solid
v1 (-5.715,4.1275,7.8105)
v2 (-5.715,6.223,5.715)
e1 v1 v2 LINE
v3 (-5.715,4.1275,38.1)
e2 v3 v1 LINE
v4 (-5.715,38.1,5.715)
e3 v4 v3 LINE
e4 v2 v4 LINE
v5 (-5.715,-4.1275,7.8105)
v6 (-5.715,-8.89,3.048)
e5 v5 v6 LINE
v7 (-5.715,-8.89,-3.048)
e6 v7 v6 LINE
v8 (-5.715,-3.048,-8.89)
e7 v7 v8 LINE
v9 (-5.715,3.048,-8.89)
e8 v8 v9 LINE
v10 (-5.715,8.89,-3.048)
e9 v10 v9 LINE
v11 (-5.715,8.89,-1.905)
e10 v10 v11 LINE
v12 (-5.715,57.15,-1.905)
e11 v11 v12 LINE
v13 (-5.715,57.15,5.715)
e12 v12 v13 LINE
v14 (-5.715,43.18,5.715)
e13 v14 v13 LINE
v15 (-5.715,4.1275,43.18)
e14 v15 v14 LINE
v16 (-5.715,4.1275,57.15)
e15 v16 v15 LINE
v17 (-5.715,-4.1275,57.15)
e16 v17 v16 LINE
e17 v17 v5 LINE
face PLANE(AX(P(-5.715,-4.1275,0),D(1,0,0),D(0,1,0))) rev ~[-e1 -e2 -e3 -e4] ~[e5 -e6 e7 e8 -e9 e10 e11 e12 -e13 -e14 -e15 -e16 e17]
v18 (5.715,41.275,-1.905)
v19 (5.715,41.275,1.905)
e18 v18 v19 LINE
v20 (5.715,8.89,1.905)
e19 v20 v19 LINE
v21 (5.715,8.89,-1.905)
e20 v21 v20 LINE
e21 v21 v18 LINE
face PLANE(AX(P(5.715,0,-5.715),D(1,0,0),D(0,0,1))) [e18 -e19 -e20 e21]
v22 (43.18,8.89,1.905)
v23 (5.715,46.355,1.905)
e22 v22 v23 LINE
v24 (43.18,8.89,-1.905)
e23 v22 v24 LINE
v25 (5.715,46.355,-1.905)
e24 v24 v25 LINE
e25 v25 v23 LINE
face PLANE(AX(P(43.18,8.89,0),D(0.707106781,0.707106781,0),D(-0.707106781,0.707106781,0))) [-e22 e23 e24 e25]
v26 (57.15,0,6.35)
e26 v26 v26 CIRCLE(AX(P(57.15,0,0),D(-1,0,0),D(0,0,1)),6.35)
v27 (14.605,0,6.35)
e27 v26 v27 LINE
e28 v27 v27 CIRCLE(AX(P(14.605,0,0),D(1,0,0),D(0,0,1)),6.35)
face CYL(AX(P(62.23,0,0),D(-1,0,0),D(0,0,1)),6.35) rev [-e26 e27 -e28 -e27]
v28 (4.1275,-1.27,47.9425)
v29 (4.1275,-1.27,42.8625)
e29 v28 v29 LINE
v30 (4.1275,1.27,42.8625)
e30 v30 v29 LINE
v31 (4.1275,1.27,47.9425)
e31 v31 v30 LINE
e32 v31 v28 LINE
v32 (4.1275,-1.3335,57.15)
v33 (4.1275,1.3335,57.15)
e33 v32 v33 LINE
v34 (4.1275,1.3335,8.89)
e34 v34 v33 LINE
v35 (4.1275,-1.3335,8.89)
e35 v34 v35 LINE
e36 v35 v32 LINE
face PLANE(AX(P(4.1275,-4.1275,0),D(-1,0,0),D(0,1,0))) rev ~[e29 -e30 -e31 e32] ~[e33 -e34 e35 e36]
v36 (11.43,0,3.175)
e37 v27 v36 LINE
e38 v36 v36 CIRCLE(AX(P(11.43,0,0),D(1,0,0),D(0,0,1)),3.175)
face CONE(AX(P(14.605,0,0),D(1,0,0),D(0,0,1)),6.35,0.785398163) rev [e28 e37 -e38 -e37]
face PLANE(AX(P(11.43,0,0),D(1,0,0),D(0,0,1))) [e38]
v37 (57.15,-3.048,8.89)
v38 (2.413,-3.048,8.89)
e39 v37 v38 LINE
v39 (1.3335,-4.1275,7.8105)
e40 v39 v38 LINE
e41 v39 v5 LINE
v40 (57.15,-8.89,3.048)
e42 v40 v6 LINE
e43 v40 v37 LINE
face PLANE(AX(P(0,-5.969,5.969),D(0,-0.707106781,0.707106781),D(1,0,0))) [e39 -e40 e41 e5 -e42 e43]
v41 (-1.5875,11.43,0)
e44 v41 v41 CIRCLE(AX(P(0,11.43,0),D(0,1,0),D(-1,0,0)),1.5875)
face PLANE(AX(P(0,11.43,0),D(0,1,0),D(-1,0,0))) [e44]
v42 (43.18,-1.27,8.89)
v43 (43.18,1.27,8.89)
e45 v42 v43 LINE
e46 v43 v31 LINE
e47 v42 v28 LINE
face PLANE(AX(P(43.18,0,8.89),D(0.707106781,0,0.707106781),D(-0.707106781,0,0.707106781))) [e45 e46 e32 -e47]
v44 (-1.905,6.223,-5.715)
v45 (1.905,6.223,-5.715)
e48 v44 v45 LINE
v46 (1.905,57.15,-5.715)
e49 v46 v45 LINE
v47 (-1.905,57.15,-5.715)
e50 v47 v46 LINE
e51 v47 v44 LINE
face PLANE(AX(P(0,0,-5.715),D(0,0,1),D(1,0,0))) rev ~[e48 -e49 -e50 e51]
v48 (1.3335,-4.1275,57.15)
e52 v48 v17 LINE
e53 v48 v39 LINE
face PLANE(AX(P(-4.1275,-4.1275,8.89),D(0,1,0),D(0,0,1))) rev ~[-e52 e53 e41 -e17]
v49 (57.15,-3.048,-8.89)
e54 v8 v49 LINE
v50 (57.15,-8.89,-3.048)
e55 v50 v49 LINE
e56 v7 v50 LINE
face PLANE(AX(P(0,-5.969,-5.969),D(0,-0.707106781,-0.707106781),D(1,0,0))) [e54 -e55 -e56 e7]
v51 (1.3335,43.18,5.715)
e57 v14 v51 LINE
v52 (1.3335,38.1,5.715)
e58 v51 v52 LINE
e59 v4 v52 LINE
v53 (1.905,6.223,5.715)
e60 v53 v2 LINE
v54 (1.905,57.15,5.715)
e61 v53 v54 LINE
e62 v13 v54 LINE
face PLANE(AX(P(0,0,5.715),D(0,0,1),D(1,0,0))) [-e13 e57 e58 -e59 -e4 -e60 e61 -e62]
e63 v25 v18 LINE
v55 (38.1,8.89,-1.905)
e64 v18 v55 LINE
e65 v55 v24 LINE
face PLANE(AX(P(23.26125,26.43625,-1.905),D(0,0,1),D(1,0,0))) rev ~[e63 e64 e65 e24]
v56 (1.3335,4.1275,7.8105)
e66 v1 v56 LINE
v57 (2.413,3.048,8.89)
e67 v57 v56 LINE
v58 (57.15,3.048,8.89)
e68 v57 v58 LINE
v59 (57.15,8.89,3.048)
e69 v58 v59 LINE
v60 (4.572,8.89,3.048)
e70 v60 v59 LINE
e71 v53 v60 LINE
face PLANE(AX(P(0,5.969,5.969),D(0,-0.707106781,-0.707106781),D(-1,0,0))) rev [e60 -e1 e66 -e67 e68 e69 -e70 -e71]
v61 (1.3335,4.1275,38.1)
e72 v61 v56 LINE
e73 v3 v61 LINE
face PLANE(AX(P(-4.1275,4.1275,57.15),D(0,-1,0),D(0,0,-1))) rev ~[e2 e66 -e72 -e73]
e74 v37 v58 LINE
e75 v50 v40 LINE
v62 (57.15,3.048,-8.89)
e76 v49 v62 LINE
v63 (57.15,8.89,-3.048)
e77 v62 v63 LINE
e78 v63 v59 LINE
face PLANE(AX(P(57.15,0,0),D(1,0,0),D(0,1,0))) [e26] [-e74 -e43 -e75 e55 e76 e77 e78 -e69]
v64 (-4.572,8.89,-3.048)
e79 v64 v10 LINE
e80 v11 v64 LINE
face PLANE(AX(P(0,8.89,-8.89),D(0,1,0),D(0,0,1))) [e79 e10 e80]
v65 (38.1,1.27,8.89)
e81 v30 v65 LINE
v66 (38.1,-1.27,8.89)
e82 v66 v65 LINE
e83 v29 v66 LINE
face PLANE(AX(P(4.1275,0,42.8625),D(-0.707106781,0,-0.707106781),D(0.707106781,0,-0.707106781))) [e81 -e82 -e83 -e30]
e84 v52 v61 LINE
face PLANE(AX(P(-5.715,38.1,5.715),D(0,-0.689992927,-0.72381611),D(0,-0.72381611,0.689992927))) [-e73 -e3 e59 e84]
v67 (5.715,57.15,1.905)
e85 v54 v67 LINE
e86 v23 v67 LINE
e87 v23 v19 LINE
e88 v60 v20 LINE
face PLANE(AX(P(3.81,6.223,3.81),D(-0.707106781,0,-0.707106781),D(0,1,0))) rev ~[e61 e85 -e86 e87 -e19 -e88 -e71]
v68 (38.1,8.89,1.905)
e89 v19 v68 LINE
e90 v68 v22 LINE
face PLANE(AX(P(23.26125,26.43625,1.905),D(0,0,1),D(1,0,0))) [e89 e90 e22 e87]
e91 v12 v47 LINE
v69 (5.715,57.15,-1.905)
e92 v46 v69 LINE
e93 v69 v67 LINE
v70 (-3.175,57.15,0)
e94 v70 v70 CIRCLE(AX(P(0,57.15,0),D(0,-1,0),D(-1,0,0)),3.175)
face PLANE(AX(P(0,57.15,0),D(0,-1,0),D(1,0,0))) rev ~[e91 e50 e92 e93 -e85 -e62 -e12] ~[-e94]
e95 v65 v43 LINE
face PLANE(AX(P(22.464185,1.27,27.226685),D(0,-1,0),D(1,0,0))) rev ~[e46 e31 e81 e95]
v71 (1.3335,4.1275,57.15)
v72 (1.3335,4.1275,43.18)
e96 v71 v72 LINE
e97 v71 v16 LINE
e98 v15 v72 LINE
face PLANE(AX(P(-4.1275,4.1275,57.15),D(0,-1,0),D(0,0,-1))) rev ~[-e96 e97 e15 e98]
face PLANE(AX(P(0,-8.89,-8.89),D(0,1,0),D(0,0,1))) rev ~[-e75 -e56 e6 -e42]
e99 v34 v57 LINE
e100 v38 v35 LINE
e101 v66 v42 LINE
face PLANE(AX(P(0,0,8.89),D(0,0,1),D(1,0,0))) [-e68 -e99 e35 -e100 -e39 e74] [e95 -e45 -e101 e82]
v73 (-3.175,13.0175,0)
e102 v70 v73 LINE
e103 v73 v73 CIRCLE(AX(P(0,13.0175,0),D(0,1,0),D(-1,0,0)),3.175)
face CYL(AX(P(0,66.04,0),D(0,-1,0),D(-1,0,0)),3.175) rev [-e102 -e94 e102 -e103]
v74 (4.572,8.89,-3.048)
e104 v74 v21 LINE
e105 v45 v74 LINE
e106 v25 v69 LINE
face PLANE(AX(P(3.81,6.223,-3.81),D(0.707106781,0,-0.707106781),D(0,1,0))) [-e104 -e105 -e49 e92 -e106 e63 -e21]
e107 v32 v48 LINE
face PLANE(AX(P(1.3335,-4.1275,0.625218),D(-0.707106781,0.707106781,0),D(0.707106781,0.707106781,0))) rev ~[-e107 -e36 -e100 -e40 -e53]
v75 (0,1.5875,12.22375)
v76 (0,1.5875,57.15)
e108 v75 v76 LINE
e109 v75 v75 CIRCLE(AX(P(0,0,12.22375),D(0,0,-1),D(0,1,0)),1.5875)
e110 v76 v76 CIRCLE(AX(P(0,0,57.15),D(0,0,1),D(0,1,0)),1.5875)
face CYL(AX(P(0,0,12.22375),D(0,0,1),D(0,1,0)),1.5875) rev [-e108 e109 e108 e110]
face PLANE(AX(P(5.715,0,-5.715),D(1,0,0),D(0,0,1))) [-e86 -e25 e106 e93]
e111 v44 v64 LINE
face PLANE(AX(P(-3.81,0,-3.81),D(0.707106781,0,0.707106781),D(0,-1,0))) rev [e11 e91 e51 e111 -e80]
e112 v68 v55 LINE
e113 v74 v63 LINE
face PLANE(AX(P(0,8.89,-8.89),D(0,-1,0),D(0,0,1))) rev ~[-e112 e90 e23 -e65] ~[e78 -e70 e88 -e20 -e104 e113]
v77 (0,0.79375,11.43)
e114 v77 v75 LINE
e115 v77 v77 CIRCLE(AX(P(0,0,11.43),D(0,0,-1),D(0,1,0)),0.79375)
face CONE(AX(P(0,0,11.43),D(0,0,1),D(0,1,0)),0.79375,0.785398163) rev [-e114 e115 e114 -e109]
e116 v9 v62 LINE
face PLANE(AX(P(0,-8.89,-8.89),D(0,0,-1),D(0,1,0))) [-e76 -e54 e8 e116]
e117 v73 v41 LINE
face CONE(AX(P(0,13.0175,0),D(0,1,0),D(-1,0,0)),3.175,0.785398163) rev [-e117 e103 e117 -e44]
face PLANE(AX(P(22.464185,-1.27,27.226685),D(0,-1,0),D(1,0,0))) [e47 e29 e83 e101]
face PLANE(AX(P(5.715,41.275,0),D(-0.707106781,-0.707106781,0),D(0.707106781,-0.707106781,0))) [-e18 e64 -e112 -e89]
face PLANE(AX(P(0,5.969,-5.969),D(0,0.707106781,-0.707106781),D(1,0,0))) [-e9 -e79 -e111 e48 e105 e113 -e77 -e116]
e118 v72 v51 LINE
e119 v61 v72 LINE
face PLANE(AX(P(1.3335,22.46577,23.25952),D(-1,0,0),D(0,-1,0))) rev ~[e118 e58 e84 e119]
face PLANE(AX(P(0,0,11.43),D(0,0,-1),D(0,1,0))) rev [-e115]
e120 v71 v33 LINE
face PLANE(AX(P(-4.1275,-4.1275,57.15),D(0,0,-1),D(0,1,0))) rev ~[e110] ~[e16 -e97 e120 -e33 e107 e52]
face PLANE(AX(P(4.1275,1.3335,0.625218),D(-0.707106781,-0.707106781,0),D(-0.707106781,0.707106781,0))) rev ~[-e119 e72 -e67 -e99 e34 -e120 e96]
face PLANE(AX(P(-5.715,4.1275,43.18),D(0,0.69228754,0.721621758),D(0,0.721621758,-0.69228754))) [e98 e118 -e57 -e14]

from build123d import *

# Parameters (mm, degrees)
F1_W          = 17.78
F1_H          = 17.78
F2_DEPTH      = 57.15
F4_SIZE       = 5.842
F6_W          = 8.255
F6_H          = 8.255
F7_DEPTH      = 57.15
F8_DEPTH      = 8.89
F10_T4_DEPTH  = 63.7100645368
F10_T9_DEPTH  = 63.7100645368
F10_T14_DEPTH = 15.4500645368
F10_T19_DEPTH = 63.7100645368
F10_T24_DEPTH = 63.7100645368
F10_T29_DEPTH = 15.4500645368
F12_W         = 11.43
F12_H         = 11.43
F13_DEPTH     = 57.15
F15_SIZE      = 3.81
F17_DEPTH     = 1.27
F19_DEPTH     = 1.905
F20_DEPTH     = 5.715
F21_T1_DEPTH  = 35.7625440314
F21_T6_DEPTH  = 35.7625440314
F21_T12_DEPTH = 35.7625440314
F21_T17_DEPTH = 35.7625440314
F21_T22_DEPTH = 35.7625440314
F22_DEPTH     = 1.5875
F25_DEPTH     = 7.0485


# Not quite as in the source:
# - a fillet or chamfer that OpenCascade refuses, or shapes differently, is made with other operations: its cross-section is extruded or revolved along the edge and cut away or added
# - an extrude ends at something that could not be found from the text; its depth is read off the source's solid


with BuildPart() as f2:
    # F1 (on Right) → F2 (new body)
    with BuildSketch(Plane.YZ):
        Rectangle(F1_W, F1_H)
    extrude(amount=F2_DEPTH)

    # F0 (on Front) → F3 (revolve, cut)
    with BuildSketch(Plane.XZ):
        Polygon((11.43, 3.175), (11.43, 0), (62.23, 0), (62.23, 6.35), (14.605, 6.35), align=None)
    revolve(axis=Axis((36.83, 0, 0), (1, 0, 0)), mode=Mode.SUBTRACT)

    # F4
    f4_edges = [f2.edges().sort_by_distance(p)[0] for p in [
        (28.575, -8.89, -8.89),
        (28.575, 8.89, 8.89),
        (28.575, -8.89, 8.89),
        (28.575, 8.89, -8.89),
    ]]
    chamfer(f4_edges, length=F4_SIZE)

    # F6 (on Top) → F7 (join)
    with BuildSketch(Plane.XY):
        Rectangle(F6_W, F6_H)
    extrude(amount=F7_DEPTH)

    # F8 (add, through all): a face of the model
    f8_faces = [f2.faces().sort_by_distance(p)[0] for p in [
        (-2.06375, 0, 0),
    ]]
    extrude(f8_faces, amount=F8_DEPTH)

    # F5 (on Right) → F9 (revolve, cut)
    with BuildSketch(Plane.YZ):
        Polygon((0, 66.04), (0, 11.43), (0.79375, 11.43), (1.5875, 12.22375), (1.5875, 66.04), align=None)
    revolve(axis=Axis((0, 0, 38.735), (0, 0, -1)), mode=Mode.SUBTRACT)

    # F10: chamfer of 2.794 on 4 edges, made by hand


with BuildPart() as f10_tool2:
    # F10_s3 → F10_t4 (new body)
    with BuildSketch(Plane.XY.offset(0.6252177316)):
        Polygon((4.1275, 1.3335), (1.3335, 4.1275), (4.1275, 4.1275), align=None)
    extrude(amount=F10_T4_DEPTH)

    split(bisect_by=Plane(origin=(0, 5.969, 5.969), x_dir=(1, 0, 0), z_dir=(0, 0.7071067812, 0.7071067812)), keep=Keep.TOP)


with BuildPart() as f2_1:
    add(f2.part)

    # F10_t1: cut F10_tool2
    add(f10_tool2.part, mode=Mode.SUBTRACT)


with BuildPart() as f10_tool7:
    # F10_s8 → F10_t9 (new body)
    with BuildSketch(Plane.XY.offset(0.6252177316)):
        Polygon((4.1275, 1.3335), (1.3335, 4.1275), (4.1275, 4.1275), align=None)
    extrude(amount=F10_T9_DEPTH)

    split(bisect_by=Plane.XY.offset(8.89), keep=Keep.TOP)


with BuildPart() as f2_2:
    add(f2_1.part)

    # F10_t6: cut F10_tool7
    add(f10_tool7.part, mode=Mode.SUBTRACT)


with BuildPart() as f10_tool12:
    # F10_s13 → F10_t14 (new body)
    with BuildSketch(Plane.XY.offset(-0.6252177316)):
        Polygon((-2.794, 4.1275), (0, 1.3335), (0, 4.1275), align=None)
    extrude(amount=-F10_T14_DEPTH)

    split(bisect_by=Plane(origin=(0, 5.969, -5.969), x_dir=(1, 0, 0), z_dir=(0, 0.7071067812, -0.7071067812)), keep=Keep.TOP)


with BuildPart() as f2_3:
    add(f2_2.part)

    # F10_t11: cut F10_tool12
    add(f10_tool12.part, mode=Mode.SUBTRACT)


with BuildPart() as f10_tool17:
    # F10_s18 → F10_t19 (new body)
    with BuildSketch(Plane.XY.offset(0.6252177316)):
        Polygon((1.3335, -4.1275), (4.1275, -1.3335), (4.1275, -4.1275), align=None)
    extrude(amount=F10_T19_DEPTH)

    split(bisect_by=Plane.XY.offset(8.89), keep=Keep.TOP)


with BuildPart() as f2_4:
    add(f2_3.part)

    # F10_t16: cut F10_tool17
    add(f10_tool17.part, mode=Mode.SUBTRACT)


with BuildPart() as f10_tool22:
    # F10_s23 → F10_t24 (new body)
    with BuildSketch(Plane.XY.offset(0.6252177316)):
        Polygon((1.3335, -4.1275), (4.1275, -1.3335), (4.1275, -4.1275), align=None)
    extrude(amount=F10_T24_DEPTH)

    split(bisect_by=Plane(origin=(0, -5.969, 5.969), x_dir=(1, 0, 0), z_dir=(0, -0.7071067812, 0.7071067812)), keep=Keep.TOP)


with BuildPart() as f2_5:
    add(f2_4.part)

    # F10_t21: cut F10_tool22
    add(f10_tool22.part, mode=Mode.SUBTRACT)


with BuildPart() as f10_tool27:
    # F10_s28 → F10_t29 (new body)
    with BuildSketch(Plane.XY.offset(-0.6252177316)):
        Polygon((-2.794, -4.1275), (0, -1.3335), (0, -4.1275), align=None)
    extrude(amount=-F10_T29_DEPTH)

    split(bisect_by=Plane(origin=(0, -5.969, -5.969), x_dir=(1, 0, 0), z_dir=(0, -0.7071067812, -0.7071067812)), keep=Keep.TOP)


with BuildPart() as f2_6:
    add(f2_5.part)

    # F10_t26: cut F10_tool27
    add(f10_tool27.part, mode=Mode.SUBTRACT)

    # F12 (on Front) → F13 (join)
    with BuildSketch(Plane.XZ):
        Rectangle(F12_W, F12_H)
    extrude(amount=-F13_DEPTH)

    # F11 (on Top) → F14 (revolve, cut)
    with BuildSketch(Plane.XY):
        Polygon((0, 66.04), (-3.175, 66.04), (-3.175, 13.0175), (-1.5875, 11.43), (0, 11.43), align=None)
    revolve(axis=Axis((0, 24.5966146997, 0), (0, 1, 0)), mode=Mode.SUBTRACT)

    # F15
    f15_edges = [f2_6.edges().sort_by_distance(p)[0] for p in [
        (5.715, 31.6865, 5.715),
        (5.715, 31.6865, -5.715),
        (-5.715, 28.575, -5.715),
    ]]
    chamfer(f15_edges, length=F15_SIZE)

    # F16 (on Front) → F17 (join, symmetric)
    with BuildSketch(Plane.XZ):
        Polygon((43.18, 8.89), (4.1275, 47.9425), (4.1275, 42.8625), (38.1, 8.89), align=None)
    extrude(amount=F17_DEPTH, both=True)

    # F18 (on Top) → F19 (join, symmetric)
    with BuildSketch(Plane.XY):
        Polygon((43.18, 8.89), (5.715, 46.355), (5.715, 41.275), (38.1, 8.89), align=None)
    extrude(amount=F19_DEPTH, both=True)

    # F1 (on Right) → F20 (join, through all)
    with BuildSketch(Plane.YZ):
        Rectangle(F1_W, F1_H)
    extrude(amount=-F20_DEPTH)

    # F21: chamfer of 5.842 on 4 edges, made by hand

    # F21_s2 → F21_t1 (cut)
    with BuildSketch(Plane.YZ.offset(-20.7387720157)):
        Polygon((-3.048, -8.89), (-8.89, -3.048), (-8.89, -8.89), align=None)
    extrude(amount=F21_T1_DEPTH, mode=Mode.SUBTRACT)


with BuildPart() as f21_tool4:
    # F21_s5 → F21_t6 (new body)
    with BuildSketch(Plane.YZ.offset(15.0237720157)):
        Polygon((3.048, 8.89), (8.89, 3.048), (8.89, 8.89), align=None)
    extrude(amount=-F21_T6_DEPTH)

    split(bisect_by=Plane.XZ.offset(-4.1275), keep=Keep.BOTTOM)

    split(bisect_by=Plane.XY.offset(5.715), keep=Keep.TOP)


with BuildPart() as f2_7:
    add(f2_6.part)

    # F21_t3: cut F21_tool4
    add(f21_tool4.part, mode=Mode.SUBTRACT)


with BuildPart() as f21_tool10:
    # F21_s11 → F21_t12 (new body)
    with BuildSketch(Plane.YZ.offset(15.0237720157)):
        Polygon((-3.048, 8.89), (-8.89, 3.048), (-8.89, 8.89), align=None)
    extrude(amount=-F21_T12_DEPTH)

    split(bisect_by=Plane.XZ.offset(4.1275), keep=Keep.TOP)


with BuildPart() as f2_8:
    add(f2_7.part)

    # F21_t9: cut F21_tool10
    add(f21_tool10.part, mode=Mode.SUBTRACT)


with BuildPart() as f21_tool15:
    # F21_s16 → F21_t17 (new body)
    with BuildSketch(Plane.YZ.offset(15.0237720157)):
        Polygon((3.048, -8.89), (8.89, -3.048), (8.89, -8.89), align=None)
    extrude(amount=-F21_T17_DEPTH)

    split(bisect_by=Plane.XY.offset(-5.715), keep=Keep.BOTTOM)


with BuildPart() as f2_9:
    add(f2_8.part)

    # F21_t14: cut F21_tool15
    add(f21_tool15.part, mode=Mode.SUBTRACT)


with BuildPart() as f21_tool20:
    # F21_s21 → F21_t22 (new body)
    with BuildSketch(Plane.YZ.offset(15.0237720157)):
        Polygon((3.048, -8.89), (8.89, -3.048), (8.89, -8.89), align=None)
    extrude(amount=-F21_T22_DEPTH)

    split(bisect_by=Plane(origin=(-3.81, 0, -3.81), x_dir=(0, 1, 0), z_dir=(-0.7071067812, 0, -0.7071067812)), keep=Keep.TOP)


with BuildPart() as f2_10:
    add(f2_9.part)

    # F21_t19: cut F21_tool20
    add(f21_tool20.part, mode=Mode.SUBTRACT)

    # F22 (add, through all): a face of the model
    f22_faces = [f2_10.faces().sort_by_distance(p)[0] for p in [
        (-4.1275, 0, 33.02),
    ]]
    extrude(f22_faces, amount=F22_DEPTH)

    # F24 (on offset) → F25 (join, through all)
    with BuildSketch(Plane(origin=(-5.715, 0, 0), x_dir=(0, -1, 0), z_dir=(-1, 0, 0))):
        Polygon((-43.18, 5.715), (-38.1, 5.715), (-4.1275, 38.1), (-4.1275, 43.18), align=None)
    extrude(amount=-F25_DEPTH)


solid = f2_10.part
